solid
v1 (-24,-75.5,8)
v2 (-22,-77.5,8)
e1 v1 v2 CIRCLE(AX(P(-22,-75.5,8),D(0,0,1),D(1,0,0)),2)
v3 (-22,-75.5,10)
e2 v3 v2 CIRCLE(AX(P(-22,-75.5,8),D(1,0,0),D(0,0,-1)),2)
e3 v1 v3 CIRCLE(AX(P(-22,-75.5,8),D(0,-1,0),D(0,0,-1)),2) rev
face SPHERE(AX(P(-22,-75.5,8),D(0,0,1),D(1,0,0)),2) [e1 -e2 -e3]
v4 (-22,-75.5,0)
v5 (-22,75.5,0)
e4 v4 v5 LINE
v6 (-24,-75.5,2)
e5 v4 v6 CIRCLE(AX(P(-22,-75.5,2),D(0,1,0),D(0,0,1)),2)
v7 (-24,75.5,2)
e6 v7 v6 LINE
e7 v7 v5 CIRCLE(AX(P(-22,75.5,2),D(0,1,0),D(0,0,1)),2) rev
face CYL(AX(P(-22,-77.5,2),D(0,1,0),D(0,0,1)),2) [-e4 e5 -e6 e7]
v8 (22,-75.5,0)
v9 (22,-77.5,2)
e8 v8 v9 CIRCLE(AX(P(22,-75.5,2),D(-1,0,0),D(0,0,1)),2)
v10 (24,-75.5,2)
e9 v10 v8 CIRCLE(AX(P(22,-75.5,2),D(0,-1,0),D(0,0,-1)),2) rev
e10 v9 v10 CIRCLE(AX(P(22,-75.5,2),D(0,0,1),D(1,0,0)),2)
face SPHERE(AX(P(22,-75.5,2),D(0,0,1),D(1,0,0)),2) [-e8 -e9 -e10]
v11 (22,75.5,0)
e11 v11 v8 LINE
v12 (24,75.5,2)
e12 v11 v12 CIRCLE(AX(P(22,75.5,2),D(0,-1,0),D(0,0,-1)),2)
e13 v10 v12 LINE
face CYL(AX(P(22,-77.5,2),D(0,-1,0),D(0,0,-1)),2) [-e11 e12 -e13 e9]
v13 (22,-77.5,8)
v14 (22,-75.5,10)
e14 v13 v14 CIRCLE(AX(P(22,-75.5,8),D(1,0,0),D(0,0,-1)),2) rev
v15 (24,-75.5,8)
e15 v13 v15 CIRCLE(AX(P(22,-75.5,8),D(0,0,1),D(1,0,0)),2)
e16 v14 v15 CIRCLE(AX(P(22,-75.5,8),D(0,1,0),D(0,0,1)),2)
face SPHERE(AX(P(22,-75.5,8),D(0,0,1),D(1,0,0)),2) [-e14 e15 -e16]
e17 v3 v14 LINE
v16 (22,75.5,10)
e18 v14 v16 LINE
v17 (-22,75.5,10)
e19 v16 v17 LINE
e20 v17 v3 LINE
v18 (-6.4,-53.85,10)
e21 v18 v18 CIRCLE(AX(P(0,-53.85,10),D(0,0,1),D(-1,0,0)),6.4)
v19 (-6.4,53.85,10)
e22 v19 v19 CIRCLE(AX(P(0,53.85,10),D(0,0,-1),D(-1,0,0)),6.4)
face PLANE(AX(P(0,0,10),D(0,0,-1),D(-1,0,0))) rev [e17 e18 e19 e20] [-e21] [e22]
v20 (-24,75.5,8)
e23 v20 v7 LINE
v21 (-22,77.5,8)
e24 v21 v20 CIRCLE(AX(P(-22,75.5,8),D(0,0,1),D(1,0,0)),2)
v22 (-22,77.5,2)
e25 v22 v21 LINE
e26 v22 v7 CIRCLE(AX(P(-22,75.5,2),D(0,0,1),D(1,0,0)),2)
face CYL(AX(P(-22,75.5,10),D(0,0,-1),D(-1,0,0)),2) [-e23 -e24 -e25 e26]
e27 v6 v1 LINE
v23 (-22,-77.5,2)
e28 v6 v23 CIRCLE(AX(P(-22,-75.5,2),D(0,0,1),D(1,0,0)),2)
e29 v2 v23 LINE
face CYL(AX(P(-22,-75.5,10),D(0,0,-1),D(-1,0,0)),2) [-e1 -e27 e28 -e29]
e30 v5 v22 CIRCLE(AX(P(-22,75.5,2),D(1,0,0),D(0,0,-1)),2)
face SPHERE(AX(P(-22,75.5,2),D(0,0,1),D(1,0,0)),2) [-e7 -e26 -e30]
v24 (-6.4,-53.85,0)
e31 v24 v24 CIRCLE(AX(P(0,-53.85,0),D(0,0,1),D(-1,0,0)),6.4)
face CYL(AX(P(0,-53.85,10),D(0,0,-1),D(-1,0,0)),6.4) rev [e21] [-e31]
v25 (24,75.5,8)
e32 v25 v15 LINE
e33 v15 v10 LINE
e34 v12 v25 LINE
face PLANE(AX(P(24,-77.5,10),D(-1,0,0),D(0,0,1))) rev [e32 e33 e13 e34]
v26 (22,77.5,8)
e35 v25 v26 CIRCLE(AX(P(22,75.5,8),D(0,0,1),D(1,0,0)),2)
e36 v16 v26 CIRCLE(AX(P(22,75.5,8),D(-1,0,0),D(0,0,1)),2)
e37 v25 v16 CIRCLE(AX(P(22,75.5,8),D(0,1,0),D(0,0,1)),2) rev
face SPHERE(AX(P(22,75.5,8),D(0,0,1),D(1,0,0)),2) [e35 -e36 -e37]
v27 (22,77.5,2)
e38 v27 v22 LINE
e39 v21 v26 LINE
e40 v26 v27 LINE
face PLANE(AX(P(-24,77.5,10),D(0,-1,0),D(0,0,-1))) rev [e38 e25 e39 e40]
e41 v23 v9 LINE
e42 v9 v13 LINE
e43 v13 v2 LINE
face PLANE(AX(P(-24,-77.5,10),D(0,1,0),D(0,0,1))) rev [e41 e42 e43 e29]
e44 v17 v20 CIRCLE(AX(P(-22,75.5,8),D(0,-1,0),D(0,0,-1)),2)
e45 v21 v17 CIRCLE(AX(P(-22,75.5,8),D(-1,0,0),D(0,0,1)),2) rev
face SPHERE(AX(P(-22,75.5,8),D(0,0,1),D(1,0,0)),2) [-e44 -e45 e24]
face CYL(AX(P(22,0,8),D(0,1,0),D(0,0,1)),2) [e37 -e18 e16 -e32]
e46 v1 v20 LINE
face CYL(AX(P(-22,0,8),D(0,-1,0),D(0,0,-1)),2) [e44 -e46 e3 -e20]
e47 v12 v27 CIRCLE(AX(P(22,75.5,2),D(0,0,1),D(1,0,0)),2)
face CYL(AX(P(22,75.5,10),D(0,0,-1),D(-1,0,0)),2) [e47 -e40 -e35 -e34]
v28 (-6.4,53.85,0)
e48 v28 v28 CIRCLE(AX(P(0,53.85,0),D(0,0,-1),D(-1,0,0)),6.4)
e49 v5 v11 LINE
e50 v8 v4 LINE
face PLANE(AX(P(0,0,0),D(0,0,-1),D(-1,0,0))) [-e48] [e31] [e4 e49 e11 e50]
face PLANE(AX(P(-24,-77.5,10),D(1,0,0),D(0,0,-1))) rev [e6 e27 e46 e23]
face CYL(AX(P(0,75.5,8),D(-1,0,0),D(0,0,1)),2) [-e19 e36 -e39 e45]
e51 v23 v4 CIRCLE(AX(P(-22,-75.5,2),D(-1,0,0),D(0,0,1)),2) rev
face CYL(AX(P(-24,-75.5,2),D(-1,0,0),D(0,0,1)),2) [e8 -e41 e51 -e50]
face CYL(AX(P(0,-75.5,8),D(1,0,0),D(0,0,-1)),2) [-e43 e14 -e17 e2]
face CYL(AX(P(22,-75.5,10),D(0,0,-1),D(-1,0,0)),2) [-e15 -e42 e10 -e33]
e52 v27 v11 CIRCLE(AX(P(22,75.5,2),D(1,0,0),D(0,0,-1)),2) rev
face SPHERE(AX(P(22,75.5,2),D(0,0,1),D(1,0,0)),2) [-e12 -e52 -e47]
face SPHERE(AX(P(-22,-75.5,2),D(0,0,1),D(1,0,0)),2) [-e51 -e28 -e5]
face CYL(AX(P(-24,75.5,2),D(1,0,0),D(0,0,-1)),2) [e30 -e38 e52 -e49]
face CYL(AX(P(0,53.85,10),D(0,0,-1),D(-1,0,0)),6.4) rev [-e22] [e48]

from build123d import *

# Parameters (mm, degrees)
SKETCH1_W           = 48
SKETCH1_H           = 155
BOSS_EXTRUDE1_DEPTH = 10
FILLET1_R           = 2
FILLET2_R           = 2
SKETCH2_R           = 6.4
CUT_EXTRUDE1_DEPTH  = 82.74503043


with BuildPart() as part:
    # Sketch1 → Boss-Extrude1 (new body)
    with BuildSketch(Plane.XY):
        Rectangle(SKETCH1_W, SKETCH1_H)
    extrude(amount=BOSS_EXTRUDE1_DEPTH)

    # Fillet1
    fillet1_edges = [part.edges().sort_by_distance(p)[0] for p in [
        (-24, 0, 10),
        (0, -77.5, 10),
        (24, 0, 10),
        (0, -77.5, 0),
        (-24, 0, 0),
        (0, 77.5, 0),
        (24, 0, 0),
        (0, 77.5, 10),
    ]]
    fillet(fillet1_edges, radius=FILLET1_R)

    # Fillet2
    # the kernel refuses this fillet: 2 mm, written as the material it takes off along each edge
    with BuildSketch(Plane(origin=(-22, 75.5, 8), x_dir=(0, 1, 0), z_dir=(-1, 0, 0))) as fillet2_piece_1_section:
        Polygon((0, 0), (FILLET2_R, 0), (FILLET2_R, -FILLET2_R), (0, -FILLET2_R), align=None)
    fillet2_piece_1 = extrude(amount=FILLET2_R, mode=Mode.PRIVATE)
    fillet2_piece_1 = fillet2_piece_1 - Plane(origin=(-22, 75.5, 8), x_dir=(0, -0.7071067811865475, -0.7071067811865475), z_dir=(-1, 0, 0)) * Sphere(FILLET2_R, mode=Mode.PRIVATE)
    add(fillet2_piece_1, mode=Mode.SUBTRACT)
    with BuildSketch(Plane(origin=(22, 75.5, 8), x_dir=(0, 1, 0), z_dir=(1, 0, 0))) as fillet2_piece_2_section:
        Polygon((0, 0), (FILLET2_R, 0), (FILLET2_R, FILLET2_R), (0, FILLET2_R), align=None)
    fillet2_piece_2 = extrude(amount=FILLET2_R, mode=Mode.PRIVATE)
    fillet2_piece_2 = fillet2_piece_2 - Plane(origin=(22, 75.5, 8), x_dir=(0, -0.7071067811865475, -0.7071067811865475), z_dir=(1, 0, 0)) * Sphere(FILLET2_R, mode=Mode.PRIVATE)
    add(fillet2_piece_2, mode=Mode.SUBTRACT)
    with BuildSketch(Plane(origin=(-22, -75.5, 8), x_dir=(-1, 0, 0), z_dir=(0, -1, 0))) as fillet2_piece_3_section:
        Polygon((0, 0), (FILLET2_R, 0), (FILLET2_R, -FILLET2_R), (0, -FILLET2_R), align=None)
    fillet2_piece_3 = extrude(amount=FILLET2_R, mode=Mode.PRIVATE)
    fillet2_piece_3 = fillet2_piece_3 - Plane(origin=(-22, -75.5, 8), x_dir=(0.7071067811865475, 0, -0.7071067811865475), z_dir=(0, -1, 0)) * Sphere(FILLET2_R, mode=Mode.PRIVATE)
    add(fillet2_piece_3, mode=Mode.SUBTRACT)
    with BuildSketch(Plane(origin=(22, -75.5, 8), x_dir=(1, 0, 0), z_dir=(0, -1, 0))) as fillet2_piece_4_section:
        Polygon((0, 0), (FILLET2_R, 0), (FILLET2_R, FILLET2_R), (0, FILLET2_R), align=None)
    fillet2_piece_4 = extrude(amount=FILLET2_R, mode=Mode.PRIVATE)
    fillet2_piece_4 = fillet2_piece_4 - Plane(origin=(22, -75.5, 8), x_dir=(-0.7071067811865475, 0, -0.7071067811865475), z_dir=(0, -1, 0)) * Sphere(FILLET2_R, mode=Mode.PRIVATE)
    add(fillet2_piece_4, mode=Mode.SUBTRACT)
    with BuildSketch(Plane(origin=(22, -75.5, 2), x_dir=(1, 0, 0), z_dir=(0, -1, 0))) as fillet2_piece_5_section:
        Polygon((0, 0), (FILLET2_R, 0), (FILLET2_R, -FILLET2_R), (0, -FILLET2_R), align=None)
    fillet2_piece_5 = extrude(amount=FILLET2_R, mode=Mode.PRIVATE)
    fillet2_piece_5 = fillet2_piece_5 - Plane(origin=(22, -75.5, 2), x_dir=(-0.7071067811865475, 0, 0.7071067811865475), z_dir=(0, -1, 0)) * Sphere(FILLET2_R, mode=Mode.PRIVATE)
    add(fillet2_piece_5, mode=Mode.SUBTRACT)
    with BuildSketch(Plane(origin=(-22, -75.5, 2), x_dir=(-1, 0, 0), z_dir=(0, -1, 0))) as fillet2_piece_6_section:
        Polygon((0, 0), (FILLET2_R, 0), (FILLET2_R, FILLET2_R), (0, FILLET2_R), align=None)
    fillet2_piece_6 = extrude(amount=FILLET2_R, mode=Mode.PRIVATE)
    fillet2_piece_6 = fillet2_piece_6 - Plane(origin=(-22, -75.5, 2), x_dir=(0.7071067811865475, 0, 0.7071067811865475), z_dir=(0, -1, 0)) * Sphere(FILLET2_R, mode=Mode.PRIVATE)
    add(fillet2_piece_6, mode=Mode.SUBTRACT)
    with BuildSketch(Plane(origin=(22, 75.5, 2), x_dir=(0, 1, 0), z_dir=(1, 0, 0))) as fillet2_piece_7_section:
        Polygon((0, 0), (FILLET2_R, 0), (FILLET2_R, -FILLET2_R), (0, -FILLET2_R), align=None)
    fillet2_piece_7 = extrude(amount=FILLET2_R, mode=Mode.PRIVATE)
    fillet2_piece_7 = fillet2_piece_7 - Plane(origin=(22, 75.5, 2), x_dir=(0, -0.7071067811865475, 0.7071067811865475), z_dir=(1, 0, 0)) * Sphere(FILLET2_R, mode=Mode.PRIVATE)
    add(fillet2_piece_7, mode=Mode.SUBTRACT)
    with BuildSketch(Plane(origin=(-22, 75.5, 2), x_dir=(0, 1, 0), z_dir=(-1, 0, 0))) as fillet2_piece_8_section:
        Polygon((0, 0), (FILLET2_R, 0), (FILLET2_R, FILLET2_R), (0, FILLET2_R), align=None)
    fillet2_piece_8 = extrude(amount=FILLET2_R, mode=Mode.PRIVATE)
    fillet2_piece_8 = fillet2_piece_8 - Plane(origin=(-22, 75.5, 2), x_dir=(0, -0.7071067811865475, 0.7071067811865475), z_dir=(-1, 0, 0)) * Sphere(FILLET2_R, mode=Mode.PRIVATE)
    add(fillet2_piece_8, mode=Mode.SUBTRACT)
    with BuildSketch(Plane(origin=(24, -77.5, 2), x_dir=(-1, 0, 0), z_dir=(0, 0, 1)), Plane(origin=(24, 77.5, 2), x_dir=(0, -1, 0), z_dir=(0, 0, 1))) as fillet2_piece_9:
        with BuildLine():
            CenterArc((FILLET2_R, -FILLET2_R), FILLET2_R, 90, 90)
            Line((0, -FILLET2_R), (0, 0))
            Line((0, 0), (FILLET2_R, 0))
        make_face()
    extrude(amount=6, mode=Mode.SUBTRACT)
    with BuildSketch(Plane(origin=(-24, -77.5, 2), x_dir=(1, 0, 0), z_dir=(0, 0, 1)), Plane(origin=(-24, 77.5, 2), x_dir=(0, -1, 0), z_dir=(0, 0, 1))) as fillet2_piece_10:
        with BuildLine():
            CenterArc((FILLET2_R, FILLET2_R), FILLET2_R, 180, 90)
            Line((0, FILLET2_R), (0, 0))
            Line((0, 0), (FILLET2_R, 0))
        make_face()
    extrude(amount=6, mode=Mode.SUBTRACT)

    # Sketch2 → Cut-Extrude1 (cut, through all)
    with BuildSketch(Plane(origin=(0, 0, 0), x_dir=(-1, 0, 0), z_dir=(0, 0, -1))):
        with Locations((0, 53.85)):
            Circle(SKETCH2_R)
    cut_extrude1 = extrude(amount=-CUT_EXTRUDE1_DEPTH, mode=Mode.SUBTRACT)

    # Mirror2: Cut-Extrude1 across plane
    add(cut_extrude1.mirror(Plane.ZX), mode=Mode.SUBTRACT)


solid = part.part
